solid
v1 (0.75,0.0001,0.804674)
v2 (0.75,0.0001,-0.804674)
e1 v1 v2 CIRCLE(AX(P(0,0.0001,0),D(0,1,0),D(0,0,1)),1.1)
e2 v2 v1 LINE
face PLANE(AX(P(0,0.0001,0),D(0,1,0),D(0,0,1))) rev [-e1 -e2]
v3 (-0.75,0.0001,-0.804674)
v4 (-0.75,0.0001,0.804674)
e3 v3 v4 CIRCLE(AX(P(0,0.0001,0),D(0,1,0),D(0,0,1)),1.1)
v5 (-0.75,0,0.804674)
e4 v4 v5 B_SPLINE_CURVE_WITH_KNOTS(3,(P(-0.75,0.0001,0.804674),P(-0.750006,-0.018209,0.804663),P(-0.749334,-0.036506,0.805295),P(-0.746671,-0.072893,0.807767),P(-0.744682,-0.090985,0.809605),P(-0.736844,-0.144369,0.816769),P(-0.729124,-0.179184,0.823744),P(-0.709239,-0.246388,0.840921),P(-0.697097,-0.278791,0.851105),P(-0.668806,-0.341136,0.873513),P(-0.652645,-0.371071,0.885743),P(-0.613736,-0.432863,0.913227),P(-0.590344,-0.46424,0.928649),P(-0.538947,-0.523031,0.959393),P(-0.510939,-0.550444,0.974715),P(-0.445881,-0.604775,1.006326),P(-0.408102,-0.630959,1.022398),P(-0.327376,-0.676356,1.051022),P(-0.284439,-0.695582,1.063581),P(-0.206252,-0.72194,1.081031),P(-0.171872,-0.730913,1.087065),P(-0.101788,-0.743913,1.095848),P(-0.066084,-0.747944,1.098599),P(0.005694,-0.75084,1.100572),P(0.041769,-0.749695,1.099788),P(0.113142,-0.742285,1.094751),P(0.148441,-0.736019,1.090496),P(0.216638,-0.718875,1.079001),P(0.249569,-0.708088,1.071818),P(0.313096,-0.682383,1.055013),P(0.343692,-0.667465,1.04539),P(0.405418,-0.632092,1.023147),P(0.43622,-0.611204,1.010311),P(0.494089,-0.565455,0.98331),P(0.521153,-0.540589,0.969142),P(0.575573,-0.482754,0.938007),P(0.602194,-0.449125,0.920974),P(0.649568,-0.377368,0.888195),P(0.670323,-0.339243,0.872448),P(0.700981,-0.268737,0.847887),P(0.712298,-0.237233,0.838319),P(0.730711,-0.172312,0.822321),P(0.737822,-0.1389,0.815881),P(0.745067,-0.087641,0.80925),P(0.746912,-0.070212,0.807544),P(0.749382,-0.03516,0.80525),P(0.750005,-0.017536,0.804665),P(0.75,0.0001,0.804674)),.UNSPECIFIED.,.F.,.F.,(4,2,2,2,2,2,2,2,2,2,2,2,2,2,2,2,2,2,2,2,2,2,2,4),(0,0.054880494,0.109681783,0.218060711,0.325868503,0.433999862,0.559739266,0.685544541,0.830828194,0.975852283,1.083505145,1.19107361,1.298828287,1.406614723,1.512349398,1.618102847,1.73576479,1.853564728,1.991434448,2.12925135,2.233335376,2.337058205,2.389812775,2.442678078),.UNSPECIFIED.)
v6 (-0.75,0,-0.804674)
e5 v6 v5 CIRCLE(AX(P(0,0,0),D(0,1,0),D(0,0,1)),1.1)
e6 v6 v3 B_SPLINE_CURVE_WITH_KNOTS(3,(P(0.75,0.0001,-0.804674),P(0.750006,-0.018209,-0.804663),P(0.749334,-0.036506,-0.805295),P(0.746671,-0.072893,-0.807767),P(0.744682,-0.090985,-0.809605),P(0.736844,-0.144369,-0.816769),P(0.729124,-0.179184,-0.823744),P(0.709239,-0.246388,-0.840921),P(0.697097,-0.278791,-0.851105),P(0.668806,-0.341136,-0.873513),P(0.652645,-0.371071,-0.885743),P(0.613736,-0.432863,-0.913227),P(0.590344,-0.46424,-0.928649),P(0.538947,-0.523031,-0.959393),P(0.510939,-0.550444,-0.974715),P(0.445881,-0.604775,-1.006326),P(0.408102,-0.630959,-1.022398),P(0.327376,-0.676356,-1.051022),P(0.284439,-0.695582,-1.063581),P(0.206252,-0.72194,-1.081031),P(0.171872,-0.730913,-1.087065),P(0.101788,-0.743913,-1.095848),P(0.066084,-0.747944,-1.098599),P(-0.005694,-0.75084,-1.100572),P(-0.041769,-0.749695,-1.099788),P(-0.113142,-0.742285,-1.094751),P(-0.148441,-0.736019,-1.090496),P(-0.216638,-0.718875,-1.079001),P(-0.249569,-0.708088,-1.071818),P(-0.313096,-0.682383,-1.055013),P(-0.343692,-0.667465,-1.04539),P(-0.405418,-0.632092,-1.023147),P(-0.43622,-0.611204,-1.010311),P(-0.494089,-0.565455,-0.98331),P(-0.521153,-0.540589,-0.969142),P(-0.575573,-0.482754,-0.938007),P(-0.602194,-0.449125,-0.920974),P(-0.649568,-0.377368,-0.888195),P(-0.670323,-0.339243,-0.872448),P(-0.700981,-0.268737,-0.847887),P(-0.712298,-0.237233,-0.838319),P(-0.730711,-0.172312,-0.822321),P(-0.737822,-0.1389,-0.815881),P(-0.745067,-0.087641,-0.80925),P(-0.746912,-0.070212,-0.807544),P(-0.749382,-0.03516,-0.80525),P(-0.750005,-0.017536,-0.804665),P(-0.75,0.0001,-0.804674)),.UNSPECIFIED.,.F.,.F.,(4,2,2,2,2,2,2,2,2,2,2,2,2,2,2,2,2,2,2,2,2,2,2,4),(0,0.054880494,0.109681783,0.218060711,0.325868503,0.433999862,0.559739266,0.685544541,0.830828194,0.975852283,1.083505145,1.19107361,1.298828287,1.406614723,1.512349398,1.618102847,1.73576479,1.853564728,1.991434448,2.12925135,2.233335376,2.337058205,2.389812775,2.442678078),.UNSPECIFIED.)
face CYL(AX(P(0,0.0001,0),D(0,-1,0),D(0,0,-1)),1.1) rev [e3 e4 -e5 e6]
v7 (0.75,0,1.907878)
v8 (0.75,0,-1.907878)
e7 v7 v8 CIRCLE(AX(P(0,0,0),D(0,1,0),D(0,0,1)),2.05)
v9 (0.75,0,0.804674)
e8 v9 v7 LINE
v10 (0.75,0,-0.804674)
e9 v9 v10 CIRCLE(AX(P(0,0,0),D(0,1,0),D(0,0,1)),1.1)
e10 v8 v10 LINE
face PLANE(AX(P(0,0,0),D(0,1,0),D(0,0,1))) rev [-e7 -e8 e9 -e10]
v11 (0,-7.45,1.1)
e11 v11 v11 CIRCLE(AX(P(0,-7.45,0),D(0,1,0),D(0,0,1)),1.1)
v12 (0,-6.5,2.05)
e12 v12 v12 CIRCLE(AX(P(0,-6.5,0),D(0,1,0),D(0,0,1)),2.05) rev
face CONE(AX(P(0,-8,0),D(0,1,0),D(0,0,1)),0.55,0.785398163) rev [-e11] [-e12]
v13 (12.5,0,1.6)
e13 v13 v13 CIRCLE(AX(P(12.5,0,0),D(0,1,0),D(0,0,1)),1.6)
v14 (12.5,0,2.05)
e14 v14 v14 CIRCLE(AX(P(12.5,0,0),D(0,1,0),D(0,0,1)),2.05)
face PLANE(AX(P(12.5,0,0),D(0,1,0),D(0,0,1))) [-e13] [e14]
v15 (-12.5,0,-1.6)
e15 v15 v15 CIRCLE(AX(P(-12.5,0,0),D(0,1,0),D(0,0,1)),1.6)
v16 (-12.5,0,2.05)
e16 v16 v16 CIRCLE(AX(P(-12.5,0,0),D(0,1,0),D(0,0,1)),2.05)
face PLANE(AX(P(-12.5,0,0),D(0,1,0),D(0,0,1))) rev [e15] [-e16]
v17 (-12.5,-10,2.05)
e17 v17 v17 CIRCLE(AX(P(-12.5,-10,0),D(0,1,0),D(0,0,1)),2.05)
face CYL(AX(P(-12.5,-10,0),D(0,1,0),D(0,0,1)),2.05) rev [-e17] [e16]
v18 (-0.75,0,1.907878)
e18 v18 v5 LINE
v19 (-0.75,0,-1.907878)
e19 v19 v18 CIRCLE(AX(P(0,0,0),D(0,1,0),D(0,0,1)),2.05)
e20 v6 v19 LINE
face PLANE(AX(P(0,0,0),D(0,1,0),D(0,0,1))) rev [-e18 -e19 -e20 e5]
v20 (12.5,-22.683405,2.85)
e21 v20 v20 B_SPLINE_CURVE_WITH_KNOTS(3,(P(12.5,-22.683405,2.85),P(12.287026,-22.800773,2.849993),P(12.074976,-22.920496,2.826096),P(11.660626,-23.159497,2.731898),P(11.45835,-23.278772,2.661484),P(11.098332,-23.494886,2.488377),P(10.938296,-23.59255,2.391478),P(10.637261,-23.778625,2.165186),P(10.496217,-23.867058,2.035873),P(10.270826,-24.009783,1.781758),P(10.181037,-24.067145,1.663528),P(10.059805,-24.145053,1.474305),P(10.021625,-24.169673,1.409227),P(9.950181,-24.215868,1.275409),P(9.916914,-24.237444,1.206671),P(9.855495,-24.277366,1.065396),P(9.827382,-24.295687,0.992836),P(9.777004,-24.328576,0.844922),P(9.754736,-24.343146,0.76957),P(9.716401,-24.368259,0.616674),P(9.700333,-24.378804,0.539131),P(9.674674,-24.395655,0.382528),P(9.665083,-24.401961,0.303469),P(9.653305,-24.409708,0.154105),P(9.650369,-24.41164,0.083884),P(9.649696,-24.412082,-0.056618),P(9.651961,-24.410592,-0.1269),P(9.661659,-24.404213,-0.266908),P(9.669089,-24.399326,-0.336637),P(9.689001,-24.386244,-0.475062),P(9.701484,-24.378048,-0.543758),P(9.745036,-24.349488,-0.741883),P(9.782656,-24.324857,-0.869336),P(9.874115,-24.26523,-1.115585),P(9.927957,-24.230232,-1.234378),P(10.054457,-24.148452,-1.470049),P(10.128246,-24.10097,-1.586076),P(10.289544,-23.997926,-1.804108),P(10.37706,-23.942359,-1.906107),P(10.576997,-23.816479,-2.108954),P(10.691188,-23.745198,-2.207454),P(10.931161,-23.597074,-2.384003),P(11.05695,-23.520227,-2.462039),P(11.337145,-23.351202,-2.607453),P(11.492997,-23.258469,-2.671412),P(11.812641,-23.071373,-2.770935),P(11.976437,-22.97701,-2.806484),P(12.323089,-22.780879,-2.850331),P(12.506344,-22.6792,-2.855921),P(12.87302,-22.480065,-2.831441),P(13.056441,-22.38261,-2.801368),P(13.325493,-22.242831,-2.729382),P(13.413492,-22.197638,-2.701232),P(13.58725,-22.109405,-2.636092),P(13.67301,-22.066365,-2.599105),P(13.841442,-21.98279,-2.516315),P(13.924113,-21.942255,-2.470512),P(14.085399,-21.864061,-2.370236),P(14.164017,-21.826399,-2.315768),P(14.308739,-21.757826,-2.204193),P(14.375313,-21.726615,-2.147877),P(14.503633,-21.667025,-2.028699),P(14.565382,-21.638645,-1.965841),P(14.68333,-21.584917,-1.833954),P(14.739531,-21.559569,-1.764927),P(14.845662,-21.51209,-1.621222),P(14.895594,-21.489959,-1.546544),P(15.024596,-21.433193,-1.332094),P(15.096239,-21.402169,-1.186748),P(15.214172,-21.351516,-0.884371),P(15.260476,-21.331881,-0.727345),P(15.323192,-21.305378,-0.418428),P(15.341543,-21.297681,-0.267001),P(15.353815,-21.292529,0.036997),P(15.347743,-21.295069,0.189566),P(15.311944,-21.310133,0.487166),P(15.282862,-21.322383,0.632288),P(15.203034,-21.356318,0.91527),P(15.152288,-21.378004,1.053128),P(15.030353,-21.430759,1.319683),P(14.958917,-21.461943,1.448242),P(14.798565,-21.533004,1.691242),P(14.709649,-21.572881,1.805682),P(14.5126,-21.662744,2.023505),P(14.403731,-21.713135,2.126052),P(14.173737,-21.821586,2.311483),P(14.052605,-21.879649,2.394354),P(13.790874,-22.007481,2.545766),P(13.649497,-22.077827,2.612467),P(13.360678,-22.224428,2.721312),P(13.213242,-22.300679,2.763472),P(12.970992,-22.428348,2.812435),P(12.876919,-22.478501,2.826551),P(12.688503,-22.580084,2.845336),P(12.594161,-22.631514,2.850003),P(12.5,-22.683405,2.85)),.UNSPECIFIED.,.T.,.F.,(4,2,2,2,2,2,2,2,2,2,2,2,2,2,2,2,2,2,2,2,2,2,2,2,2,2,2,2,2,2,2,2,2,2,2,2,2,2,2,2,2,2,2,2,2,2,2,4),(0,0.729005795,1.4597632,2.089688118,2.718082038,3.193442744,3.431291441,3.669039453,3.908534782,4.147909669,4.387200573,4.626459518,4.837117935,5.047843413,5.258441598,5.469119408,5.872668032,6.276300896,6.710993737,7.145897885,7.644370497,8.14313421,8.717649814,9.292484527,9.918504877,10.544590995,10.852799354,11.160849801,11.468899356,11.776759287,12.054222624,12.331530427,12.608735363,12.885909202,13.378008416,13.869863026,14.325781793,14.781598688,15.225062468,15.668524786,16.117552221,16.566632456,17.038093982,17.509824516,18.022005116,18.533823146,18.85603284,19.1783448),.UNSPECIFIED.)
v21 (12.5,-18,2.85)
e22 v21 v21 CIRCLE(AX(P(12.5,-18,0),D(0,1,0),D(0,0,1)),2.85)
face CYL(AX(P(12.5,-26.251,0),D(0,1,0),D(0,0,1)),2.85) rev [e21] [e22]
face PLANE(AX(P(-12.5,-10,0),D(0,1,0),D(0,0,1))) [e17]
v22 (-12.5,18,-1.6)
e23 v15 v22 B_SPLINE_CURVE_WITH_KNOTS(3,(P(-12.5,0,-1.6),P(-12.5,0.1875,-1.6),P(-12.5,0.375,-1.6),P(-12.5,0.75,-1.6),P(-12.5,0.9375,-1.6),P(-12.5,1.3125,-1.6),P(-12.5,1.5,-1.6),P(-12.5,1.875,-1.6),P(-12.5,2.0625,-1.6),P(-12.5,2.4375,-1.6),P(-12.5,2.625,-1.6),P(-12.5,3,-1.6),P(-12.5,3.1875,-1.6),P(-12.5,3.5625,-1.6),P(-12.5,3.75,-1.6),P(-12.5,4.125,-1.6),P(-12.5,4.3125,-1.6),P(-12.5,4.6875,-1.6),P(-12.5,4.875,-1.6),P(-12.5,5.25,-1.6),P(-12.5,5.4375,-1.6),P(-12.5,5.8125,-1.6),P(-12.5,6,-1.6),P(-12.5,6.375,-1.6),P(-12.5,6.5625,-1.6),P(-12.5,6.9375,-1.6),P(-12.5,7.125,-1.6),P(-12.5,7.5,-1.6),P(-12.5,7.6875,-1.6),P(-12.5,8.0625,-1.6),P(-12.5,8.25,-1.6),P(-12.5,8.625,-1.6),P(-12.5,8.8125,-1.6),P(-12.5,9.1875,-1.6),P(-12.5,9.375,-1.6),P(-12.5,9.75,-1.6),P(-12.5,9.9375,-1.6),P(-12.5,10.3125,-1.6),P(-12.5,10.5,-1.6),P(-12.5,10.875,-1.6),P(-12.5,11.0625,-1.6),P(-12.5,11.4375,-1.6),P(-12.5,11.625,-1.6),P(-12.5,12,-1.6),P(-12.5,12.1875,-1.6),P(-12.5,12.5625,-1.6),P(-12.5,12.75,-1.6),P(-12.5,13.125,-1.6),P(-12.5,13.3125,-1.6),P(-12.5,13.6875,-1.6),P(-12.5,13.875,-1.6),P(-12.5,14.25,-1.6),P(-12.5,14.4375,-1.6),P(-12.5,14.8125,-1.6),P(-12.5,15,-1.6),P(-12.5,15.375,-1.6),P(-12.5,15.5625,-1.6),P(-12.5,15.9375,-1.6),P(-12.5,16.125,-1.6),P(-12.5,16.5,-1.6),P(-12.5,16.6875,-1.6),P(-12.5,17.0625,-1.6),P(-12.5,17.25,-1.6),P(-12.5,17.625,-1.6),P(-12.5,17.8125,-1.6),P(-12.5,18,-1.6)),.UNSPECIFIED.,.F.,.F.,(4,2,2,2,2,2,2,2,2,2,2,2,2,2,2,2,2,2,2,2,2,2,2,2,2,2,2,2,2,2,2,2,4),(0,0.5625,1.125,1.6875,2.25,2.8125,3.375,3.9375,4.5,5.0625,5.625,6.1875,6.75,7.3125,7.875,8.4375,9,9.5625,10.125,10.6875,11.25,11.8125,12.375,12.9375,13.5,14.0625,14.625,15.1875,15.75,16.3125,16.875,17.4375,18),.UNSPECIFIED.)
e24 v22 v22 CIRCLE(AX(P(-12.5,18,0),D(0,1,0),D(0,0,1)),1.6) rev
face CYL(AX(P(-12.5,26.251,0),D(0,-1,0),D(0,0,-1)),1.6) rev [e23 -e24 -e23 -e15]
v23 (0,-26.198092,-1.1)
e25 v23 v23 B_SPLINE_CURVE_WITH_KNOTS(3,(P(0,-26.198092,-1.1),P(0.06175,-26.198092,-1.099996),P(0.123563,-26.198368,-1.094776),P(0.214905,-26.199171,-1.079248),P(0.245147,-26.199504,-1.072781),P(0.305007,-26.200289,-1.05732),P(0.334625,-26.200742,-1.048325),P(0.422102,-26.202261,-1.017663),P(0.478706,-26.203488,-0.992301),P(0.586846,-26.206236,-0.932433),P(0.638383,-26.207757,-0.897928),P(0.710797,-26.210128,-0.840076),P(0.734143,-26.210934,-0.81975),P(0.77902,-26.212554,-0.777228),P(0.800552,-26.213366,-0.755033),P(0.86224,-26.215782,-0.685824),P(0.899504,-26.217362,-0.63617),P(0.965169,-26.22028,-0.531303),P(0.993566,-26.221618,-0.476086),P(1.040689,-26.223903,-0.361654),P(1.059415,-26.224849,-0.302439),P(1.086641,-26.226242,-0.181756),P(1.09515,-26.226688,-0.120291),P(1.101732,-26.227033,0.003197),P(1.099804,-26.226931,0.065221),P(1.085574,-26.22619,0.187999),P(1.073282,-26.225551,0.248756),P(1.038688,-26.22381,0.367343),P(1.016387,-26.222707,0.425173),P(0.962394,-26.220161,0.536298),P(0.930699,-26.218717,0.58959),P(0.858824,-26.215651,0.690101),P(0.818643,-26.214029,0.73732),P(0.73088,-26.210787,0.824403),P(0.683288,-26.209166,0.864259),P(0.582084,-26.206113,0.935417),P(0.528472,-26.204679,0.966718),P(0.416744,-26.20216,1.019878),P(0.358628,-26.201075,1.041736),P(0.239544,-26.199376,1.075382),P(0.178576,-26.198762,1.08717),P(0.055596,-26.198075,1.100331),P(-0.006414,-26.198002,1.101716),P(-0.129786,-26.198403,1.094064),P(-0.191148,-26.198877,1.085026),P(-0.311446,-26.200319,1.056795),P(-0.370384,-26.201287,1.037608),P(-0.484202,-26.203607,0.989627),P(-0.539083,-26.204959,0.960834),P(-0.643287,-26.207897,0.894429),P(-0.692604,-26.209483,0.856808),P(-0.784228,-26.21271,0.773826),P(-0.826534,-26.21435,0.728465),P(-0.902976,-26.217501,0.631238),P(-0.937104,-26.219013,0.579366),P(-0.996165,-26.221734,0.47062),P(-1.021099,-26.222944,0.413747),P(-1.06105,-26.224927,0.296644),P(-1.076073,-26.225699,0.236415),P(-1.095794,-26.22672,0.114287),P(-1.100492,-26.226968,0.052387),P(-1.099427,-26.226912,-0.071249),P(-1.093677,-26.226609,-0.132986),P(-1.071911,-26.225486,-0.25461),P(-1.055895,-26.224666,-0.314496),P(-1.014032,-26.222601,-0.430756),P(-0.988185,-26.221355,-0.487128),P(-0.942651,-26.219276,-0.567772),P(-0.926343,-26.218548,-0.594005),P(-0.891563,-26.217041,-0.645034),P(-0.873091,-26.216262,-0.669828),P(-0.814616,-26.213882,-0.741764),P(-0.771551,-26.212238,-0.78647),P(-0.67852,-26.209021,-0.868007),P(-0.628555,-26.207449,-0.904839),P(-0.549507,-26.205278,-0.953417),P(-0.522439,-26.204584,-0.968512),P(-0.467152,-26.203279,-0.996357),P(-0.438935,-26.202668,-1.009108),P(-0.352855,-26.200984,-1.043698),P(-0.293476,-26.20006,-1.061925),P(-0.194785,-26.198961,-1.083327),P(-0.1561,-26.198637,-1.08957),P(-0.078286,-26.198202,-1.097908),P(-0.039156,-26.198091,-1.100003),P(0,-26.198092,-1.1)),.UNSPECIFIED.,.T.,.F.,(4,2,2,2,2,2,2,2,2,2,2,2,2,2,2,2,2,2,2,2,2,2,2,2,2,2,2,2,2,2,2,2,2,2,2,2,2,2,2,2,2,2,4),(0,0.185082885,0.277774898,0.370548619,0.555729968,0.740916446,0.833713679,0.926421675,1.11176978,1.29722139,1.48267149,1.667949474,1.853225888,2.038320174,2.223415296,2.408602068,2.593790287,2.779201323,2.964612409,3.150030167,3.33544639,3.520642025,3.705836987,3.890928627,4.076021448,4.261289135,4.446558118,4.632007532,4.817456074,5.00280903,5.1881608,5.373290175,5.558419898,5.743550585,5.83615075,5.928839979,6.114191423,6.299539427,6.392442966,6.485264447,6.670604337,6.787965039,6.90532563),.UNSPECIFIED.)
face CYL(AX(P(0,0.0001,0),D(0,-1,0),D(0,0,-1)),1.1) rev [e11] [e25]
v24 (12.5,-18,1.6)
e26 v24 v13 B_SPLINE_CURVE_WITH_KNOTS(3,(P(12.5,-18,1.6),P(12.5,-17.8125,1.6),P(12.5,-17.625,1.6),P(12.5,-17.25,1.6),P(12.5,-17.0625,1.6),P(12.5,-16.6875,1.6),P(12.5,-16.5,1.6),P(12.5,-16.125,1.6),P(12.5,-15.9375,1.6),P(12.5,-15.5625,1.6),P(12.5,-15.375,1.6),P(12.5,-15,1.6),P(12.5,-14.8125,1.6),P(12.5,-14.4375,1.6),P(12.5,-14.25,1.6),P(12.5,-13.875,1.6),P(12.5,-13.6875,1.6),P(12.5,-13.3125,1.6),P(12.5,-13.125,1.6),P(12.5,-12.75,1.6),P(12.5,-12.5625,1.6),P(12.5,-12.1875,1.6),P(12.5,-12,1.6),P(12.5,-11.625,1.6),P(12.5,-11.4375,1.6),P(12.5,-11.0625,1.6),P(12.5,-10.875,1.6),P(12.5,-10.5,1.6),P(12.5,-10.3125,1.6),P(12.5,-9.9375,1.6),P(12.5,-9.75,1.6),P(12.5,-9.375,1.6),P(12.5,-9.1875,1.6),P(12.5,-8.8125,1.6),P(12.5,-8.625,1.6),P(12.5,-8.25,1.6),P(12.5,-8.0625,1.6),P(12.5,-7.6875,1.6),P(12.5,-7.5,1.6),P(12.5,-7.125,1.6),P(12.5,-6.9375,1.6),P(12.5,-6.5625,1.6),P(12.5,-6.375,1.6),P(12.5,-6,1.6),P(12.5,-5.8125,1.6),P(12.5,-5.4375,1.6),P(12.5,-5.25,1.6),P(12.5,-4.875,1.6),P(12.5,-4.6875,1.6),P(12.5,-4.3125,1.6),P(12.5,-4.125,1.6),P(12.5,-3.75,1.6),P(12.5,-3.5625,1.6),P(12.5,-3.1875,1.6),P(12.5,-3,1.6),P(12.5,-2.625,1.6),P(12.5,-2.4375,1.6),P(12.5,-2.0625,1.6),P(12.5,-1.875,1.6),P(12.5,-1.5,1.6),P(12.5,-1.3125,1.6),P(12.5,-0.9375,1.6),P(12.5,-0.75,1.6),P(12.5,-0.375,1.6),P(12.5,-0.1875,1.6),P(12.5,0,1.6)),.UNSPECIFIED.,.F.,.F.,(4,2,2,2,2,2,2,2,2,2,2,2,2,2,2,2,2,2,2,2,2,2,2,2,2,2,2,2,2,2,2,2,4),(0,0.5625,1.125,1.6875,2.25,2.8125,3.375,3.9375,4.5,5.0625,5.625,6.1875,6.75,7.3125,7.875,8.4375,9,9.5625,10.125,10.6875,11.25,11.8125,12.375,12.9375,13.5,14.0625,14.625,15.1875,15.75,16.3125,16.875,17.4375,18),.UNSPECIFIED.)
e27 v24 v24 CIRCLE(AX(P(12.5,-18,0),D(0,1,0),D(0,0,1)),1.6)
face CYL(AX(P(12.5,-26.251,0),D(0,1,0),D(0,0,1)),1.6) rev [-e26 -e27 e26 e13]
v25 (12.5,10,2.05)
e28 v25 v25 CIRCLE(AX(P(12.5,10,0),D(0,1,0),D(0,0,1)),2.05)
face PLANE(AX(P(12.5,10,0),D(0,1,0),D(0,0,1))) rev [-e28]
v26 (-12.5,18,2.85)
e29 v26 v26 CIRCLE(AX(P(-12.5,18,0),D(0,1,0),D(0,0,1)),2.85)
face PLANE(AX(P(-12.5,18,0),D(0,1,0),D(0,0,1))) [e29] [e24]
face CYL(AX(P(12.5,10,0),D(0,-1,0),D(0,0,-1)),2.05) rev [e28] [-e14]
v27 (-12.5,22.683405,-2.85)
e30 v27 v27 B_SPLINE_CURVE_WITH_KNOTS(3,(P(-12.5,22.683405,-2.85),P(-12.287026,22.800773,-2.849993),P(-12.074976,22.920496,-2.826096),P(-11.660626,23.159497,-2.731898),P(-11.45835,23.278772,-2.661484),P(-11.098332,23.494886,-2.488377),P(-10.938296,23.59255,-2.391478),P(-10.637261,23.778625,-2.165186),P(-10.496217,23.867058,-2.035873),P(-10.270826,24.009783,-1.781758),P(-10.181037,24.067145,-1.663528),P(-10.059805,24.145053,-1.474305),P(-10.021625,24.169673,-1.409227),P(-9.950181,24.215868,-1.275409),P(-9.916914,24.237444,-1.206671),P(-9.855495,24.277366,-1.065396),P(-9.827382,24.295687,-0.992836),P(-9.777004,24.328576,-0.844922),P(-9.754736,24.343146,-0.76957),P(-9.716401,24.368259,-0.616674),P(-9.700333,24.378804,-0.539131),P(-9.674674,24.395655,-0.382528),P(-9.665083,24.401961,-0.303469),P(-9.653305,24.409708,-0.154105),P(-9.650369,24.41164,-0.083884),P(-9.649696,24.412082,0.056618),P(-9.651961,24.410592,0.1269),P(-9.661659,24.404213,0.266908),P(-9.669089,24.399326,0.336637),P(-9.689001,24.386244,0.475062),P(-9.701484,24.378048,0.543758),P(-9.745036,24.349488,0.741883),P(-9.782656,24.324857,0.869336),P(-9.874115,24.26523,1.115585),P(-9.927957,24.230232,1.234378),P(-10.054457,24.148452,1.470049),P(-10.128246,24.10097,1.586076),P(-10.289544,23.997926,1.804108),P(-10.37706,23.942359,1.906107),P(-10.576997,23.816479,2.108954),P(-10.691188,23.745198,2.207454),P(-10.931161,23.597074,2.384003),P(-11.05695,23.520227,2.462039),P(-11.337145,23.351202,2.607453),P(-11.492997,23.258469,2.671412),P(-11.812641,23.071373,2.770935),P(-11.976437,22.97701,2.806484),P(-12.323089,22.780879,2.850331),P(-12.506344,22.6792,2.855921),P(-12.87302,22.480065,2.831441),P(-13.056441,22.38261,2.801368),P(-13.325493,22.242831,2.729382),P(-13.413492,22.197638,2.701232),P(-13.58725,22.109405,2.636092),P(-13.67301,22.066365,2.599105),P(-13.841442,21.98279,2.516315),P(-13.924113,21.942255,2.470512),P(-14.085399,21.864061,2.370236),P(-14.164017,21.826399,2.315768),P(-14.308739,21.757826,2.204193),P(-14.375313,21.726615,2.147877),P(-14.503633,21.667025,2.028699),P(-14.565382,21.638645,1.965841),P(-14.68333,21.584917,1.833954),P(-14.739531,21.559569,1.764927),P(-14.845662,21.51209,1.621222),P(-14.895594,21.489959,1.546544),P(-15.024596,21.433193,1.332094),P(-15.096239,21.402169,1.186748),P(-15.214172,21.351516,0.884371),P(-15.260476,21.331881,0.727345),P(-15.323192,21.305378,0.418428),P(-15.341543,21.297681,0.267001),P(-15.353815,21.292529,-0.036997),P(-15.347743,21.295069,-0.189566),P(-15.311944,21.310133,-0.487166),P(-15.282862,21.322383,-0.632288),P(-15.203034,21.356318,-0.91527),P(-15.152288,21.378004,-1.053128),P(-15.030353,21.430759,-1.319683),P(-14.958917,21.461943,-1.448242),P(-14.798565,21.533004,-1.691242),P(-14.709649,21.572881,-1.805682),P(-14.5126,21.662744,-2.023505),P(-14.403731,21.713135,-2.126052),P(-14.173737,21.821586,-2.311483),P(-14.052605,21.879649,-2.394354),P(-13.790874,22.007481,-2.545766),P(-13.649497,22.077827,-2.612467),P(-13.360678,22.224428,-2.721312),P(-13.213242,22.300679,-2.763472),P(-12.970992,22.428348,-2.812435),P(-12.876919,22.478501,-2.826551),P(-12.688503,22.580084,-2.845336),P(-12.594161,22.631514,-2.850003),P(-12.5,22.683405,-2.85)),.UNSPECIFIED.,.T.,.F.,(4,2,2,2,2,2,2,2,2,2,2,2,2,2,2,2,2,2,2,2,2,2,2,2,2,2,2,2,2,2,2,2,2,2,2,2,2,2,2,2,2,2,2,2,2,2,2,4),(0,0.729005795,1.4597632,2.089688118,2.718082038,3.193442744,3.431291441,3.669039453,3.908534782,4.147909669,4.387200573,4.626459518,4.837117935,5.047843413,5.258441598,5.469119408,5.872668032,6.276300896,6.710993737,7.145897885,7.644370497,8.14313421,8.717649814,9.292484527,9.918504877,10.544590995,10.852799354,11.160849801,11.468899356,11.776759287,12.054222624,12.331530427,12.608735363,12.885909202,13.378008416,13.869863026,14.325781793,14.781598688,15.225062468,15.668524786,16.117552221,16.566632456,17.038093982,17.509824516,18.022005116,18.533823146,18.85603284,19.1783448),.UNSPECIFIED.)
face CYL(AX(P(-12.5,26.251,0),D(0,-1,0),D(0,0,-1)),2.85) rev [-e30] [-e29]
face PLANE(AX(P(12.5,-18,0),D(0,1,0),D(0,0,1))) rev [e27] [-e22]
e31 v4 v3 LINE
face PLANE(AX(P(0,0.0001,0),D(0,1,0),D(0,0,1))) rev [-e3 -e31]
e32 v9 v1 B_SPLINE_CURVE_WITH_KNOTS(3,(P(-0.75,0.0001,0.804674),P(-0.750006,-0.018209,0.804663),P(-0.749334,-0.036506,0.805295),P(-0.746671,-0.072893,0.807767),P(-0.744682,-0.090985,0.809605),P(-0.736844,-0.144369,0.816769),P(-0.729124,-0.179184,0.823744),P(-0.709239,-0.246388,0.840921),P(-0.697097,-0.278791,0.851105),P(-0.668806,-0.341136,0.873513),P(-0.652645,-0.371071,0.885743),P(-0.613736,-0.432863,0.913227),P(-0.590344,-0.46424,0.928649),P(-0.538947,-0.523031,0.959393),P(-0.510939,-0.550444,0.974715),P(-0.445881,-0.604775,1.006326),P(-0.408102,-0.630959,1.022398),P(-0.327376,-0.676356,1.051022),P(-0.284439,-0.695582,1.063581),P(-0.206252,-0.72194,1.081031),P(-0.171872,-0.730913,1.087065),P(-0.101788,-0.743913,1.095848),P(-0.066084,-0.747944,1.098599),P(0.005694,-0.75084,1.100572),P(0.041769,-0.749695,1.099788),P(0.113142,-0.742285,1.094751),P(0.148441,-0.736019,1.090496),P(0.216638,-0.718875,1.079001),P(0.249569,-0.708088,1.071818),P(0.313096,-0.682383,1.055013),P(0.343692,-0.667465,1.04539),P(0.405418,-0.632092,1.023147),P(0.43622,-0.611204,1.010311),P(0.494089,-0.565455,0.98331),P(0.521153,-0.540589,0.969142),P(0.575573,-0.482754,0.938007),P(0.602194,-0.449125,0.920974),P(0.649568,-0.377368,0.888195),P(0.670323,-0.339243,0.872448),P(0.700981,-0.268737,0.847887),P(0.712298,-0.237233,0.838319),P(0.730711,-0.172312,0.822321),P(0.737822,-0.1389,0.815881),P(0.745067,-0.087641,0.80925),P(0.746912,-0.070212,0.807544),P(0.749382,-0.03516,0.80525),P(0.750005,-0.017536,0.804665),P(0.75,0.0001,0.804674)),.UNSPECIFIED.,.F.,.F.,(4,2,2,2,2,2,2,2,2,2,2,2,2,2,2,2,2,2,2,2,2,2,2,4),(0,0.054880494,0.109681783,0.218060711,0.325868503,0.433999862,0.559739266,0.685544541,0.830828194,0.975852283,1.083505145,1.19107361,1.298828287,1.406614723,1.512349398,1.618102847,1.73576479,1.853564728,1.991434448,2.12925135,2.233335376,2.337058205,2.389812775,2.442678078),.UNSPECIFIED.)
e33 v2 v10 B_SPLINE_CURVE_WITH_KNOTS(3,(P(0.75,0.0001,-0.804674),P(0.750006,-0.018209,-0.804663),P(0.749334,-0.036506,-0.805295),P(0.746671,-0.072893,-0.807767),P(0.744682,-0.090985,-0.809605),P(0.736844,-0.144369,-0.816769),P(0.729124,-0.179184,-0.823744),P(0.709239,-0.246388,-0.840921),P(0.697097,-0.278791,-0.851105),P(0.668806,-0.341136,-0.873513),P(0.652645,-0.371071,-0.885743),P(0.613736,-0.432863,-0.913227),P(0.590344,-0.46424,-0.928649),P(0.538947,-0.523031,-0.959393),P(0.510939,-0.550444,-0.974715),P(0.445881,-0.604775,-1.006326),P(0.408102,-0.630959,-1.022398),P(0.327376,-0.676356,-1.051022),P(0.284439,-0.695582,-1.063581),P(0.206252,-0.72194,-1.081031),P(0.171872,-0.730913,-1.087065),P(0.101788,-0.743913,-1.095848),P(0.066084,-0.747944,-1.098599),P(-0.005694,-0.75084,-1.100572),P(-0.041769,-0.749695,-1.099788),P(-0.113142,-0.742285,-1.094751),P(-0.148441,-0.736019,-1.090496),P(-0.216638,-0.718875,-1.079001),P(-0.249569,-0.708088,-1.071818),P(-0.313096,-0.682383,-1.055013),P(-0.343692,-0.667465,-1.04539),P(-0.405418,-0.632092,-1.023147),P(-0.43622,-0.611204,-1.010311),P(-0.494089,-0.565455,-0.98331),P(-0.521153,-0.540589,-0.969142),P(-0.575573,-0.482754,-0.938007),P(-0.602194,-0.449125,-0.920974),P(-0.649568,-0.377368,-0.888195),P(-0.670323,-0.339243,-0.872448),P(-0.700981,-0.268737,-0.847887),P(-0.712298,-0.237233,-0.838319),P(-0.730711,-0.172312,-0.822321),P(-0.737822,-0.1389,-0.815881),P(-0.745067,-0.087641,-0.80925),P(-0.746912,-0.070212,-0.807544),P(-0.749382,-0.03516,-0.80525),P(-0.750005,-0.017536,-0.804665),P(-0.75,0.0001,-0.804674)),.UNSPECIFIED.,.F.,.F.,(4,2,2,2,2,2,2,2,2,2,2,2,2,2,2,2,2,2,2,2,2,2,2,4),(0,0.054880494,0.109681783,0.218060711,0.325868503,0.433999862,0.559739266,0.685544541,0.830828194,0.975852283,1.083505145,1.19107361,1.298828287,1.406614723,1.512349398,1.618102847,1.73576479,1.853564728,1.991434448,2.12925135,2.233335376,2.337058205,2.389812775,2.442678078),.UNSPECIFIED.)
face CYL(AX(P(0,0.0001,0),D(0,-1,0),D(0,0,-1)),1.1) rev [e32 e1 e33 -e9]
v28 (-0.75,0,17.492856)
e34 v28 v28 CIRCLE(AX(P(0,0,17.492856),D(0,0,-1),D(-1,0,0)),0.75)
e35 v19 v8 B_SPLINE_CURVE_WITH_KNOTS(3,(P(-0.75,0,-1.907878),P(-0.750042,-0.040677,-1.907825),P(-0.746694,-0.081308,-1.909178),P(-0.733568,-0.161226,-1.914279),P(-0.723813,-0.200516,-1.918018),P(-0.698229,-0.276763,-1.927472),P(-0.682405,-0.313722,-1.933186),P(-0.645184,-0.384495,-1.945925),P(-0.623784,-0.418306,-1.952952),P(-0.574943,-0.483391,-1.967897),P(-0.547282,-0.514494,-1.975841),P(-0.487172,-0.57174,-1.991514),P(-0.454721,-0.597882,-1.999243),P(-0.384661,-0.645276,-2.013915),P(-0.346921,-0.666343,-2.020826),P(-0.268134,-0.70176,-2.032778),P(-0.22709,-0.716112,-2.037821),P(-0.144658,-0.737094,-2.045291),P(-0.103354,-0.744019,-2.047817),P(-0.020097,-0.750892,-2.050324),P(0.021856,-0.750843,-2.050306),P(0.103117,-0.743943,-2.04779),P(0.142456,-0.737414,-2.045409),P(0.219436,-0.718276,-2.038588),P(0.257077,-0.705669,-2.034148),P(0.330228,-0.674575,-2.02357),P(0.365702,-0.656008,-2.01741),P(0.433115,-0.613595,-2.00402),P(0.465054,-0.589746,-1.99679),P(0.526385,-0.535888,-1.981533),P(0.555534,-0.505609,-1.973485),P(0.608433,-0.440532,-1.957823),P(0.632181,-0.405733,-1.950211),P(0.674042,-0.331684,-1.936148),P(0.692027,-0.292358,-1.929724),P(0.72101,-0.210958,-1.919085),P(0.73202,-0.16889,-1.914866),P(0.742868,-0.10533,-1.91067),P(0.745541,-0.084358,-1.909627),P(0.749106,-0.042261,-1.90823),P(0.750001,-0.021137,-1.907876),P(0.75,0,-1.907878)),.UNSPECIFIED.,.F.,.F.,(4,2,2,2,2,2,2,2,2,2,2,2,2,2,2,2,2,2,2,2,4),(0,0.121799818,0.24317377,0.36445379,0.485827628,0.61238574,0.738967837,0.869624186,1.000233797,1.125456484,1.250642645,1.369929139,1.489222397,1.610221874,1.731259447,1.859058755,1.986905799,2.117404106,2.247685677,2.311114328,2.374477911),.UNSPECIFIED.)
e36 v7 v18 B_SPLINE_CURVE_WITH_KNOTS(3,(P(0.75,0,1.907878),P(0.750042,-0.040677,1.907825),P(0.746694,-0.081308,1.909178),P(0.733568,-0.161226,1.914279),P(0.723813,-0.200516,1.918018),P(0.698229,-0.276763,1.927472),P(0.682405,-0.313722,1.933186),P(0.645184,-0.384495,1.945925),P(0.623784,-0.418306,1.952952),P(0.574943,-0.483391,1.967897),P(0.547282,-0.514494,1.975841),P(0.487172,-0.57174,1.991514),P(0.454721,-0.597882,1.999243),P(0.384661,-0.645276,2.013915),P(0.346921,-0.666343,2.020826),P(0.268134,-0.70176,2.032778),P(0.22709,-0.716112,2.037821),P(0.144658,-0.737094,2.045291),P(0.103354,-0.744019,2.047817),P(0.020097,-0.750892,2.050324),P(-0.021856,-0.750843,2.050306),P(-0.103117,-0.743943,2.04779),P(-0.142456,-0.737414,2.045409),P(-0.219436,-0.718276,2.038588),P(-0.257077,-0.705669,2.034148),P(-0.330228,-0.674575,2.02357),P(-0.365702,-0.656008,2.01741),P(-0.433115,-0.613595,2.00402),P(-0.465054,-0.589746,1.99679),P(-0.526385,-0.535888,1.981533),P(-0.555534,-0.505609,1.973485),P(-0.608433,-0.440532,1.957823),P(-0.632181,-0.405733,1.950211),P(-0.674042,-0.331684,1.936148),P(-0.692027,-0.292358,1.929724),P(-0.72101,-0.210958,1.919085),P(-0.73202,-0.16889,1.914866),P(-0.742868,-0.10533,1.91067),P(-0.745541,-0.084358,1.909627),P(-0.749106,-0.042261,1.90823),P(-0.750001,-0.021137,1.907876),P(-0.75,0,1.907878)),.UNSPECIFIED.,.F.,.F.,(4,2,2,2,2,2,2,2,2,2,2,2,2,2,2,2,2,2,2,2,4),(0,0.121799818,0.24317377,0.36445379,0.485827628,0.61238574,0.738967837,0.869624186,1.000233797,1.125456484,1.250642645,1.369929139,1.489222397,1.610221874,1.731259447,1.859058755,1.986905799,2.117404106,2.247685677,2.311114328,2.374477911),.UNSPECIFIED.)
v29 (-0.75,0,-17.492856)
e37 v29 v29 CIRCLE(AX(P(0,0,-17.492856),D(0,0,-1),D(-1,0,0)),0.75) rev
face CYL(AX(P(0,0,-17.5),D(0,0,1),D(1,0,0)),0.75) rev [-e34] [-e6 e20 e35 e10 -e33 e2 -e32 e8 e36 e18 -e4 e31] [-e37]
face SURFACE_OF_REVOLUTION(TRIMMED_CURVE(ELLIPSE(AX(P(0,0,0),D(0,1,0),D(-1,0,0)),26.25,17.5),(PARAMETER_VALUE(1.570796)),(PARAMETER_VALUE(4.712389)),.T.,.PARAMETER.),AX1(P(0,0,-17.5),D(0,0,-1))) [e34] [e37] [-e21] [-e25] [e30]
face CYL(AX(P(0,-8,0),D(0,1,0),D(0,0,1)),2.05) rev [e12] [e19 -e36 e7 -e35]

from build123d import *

# Parameters (mm, degrees)
CUT_EXTRUDE2_DEPTH      = 42.041138069
CUT_EXTRUDE2_DEPTH_BACK = 42.041138069
SKETCH4_R               = 0.75
CUT_EXTRUDE3_START      = -27
CUT_EXTRUDE3_OUTLINE_R  = 1.1
CUT_EXTRUDE3_DEPTH      = 27.0001
SKETCH6_R               = 2.05
CUT_EXTRUDE4_DEPTH      = 10
SKETCH6_5_R             = 2.05
CUT_EXTRUDE10_DEPTH     = 10
CUT_EXTRUDE8_REACH      = 43.038
SKETCH6_4_R             = 1.6
CUT_EXTRUDE11_REACH     = 43.038
SKETCH6_6_R             = 1.6
CUT_EXTRUDE9_REACH      = 61.038
CUT_EXTRUDE9_START      = -18
SKETCH11_R              = 2.85
CUT_EXTRUDE12_REACH     = 61.038
CUT_EXTRUDE12_START     = 18
SKETCH11_3_R            = 2.85
SKETCH12_R              = 2.05
CUT_EXTRUDE13_DEPTH     = 8
CHAMFER1_SIZE           = 1.5


with BuildPart() as part:
    # Sketch1 → Revolve4 (revolve)
    with BuildSketch(Plane(origin=(0, 0, 0), x_dir=(1, 0, 0), z_dir=(0, 1, 0))):
        with BuildLine():
            Line((0, 17.5), (0, -17.5))
            add(Edge.make_bspline(
                [(0, -17.5), (26.25, -17.5), (26.25, 0), (26.25, 17.5), (0, 17.5)],
                knots=[1.570796327, 1.570796327, 1.570796327, 3.141592654, 3.141592654, 4.71238898, 4.71238898, 4.71238898], degree=2, weights=[1, 0.707106781, 1, 0.707106781, 1]))
        make_face()
    revolve(axis=Axis((0, 0, -17.5), (0, 0, 1)))

    # Sketch4 → Cut-Extrude2 (cut, two sides: drawn at the far end of the back side and taken through both)
    with BuildSketch(Plane.XY.offset(-CUT_EXTRUDE2_DEPTH_BACK)):
        with Locations(Location((0, 0, 0), (0, 0, 180))):
            Circle(SKETCH4_R)
    extrude(amount=CUT_EXTRUDE2_DEPTH + CUT_EXTRUDE2_DEPTH_BACK, mode=Mode.SUBTRACT)

    # Cut-Extrude3: read off the stored shape, not the designer's step
    # Cut-Extrude3 outline → Cut-Extrude3 (cut)
    with BuildSketch(Plane(origin=(0, 0, 0), x_dir=(1, 0, 0), z_dir=(0, 1, 0)).offset(CUT_EXTRUDE3_START)):
        Circle(CUT_EXTRUDE3_OUTLINE_R)
    extrude(amount=CUT_EXTRUDE3_DEPTH, mode=Mode.SUBTRACT)

    # Sketch6 → Cut-Extrude4 (cut)
    with BuildSketch(Plane(origin=(0, 0, 0), x_dir=(1, 0, 0), z_dir=(0, 1, 0))):
        with Locations(Location((-12.5, 0, 0), (0, 0, 270))):
            Circle(SKETCH6_R)
    extrude(amount=-CUT_EXTRUDE4_DEPTH, mode=Mode.SUBTRACT)

    # Sketch6<5> → Cut-Extrude10 (cut)
    with BuildSketch(Plane(origin=(0, 0, 0), x_dir=(1, 0, 0), z_dir=(0, 1, 0))):
        with Locations(Location((12.5, 0, 0), (0, 0, 270))):
            Circle(SKETCH6_5_R)
    extrude(amount=CUT_EXTRUDE10_DEPTH, mode=Mode.SUBTRACT)

    # Sketch6<4> → Cut-Extrude8 (cut, up to next)
    with BuildSketch(Plane(origin=(0, 0, 0), x_dir=(1, 0, 0), z_dir=(0, 1, 0)), mode=Mode.PRIVATE) as cut_extrude8_sk1:
        with Locations(Location((12.5, 0, 0), (0, 0, 270))):
            Circle(SKETCH6_4_R)
    cut_extrude8_tool1 = extrude(cut_extrude8_sk1.sketch, amount=-CUT_EXTRUDE8_REACH, mode=Mode.PRIVATE) & part.part
    add(cut_extrude8_tool1.solids().sort_by_distance((12.5, 0, 0))[0], mode=Mode.SUBTRACT)

    # Sketch6<6> → Cut-Extrude11 (cut, up to next)
    with BuildSketch(Plane(origin=(0, 0, 0), x_dir=(1, 0, 0), z_dir=(0, 1, 0)), mode=Mode.PRIVATE) as cut_extrude11_sk1:
        with Locations(Location((-12.5, 0, 0), (0, 0, 90))):
            Circle(SKETCH6_6_R)
    cut_extrude11_tool1 = extrude(cut_extrude11_sk1.sketch, amount=CUT_EXTRUDE11_REACH, mode=Mode.PRIVATE) & part.part
    add(cut_extrude11_tool1.solids().sort_by_distance((-12.5, 0, 0))[0], mode=Mode.SUBTRACT)

    # Sketch11 → Cut-Extrude9 (cut, up to next)
    with BuildSketch(Plane(origin=(0, 0, 0), x_dir=(1, 0, 0), z_dir=(0, 1, 0)).offset(CUT_EXTRUDE9_START), mode=Mode.PRIVATE) as cut_extrude9_sk1:
        with Locations(Location((12.5, 0, 0), (0, 0, 270))):
            Circle(SKETCH11_R)
    cut_extrude9_tool1 = extrude(cut_extrude9_sk1.sketch, amount=-CUT_EXTRUDE9_REACH, mode=Mode.PRIVATE) & part.part
    add(cut_extrude9_tool1.solids().sort_by_distance((12.5, -18, 0))[0], mode=Mode.SUBTRACT)

    # Sketch11<3> → Cut-Extrude12 (cut, up to next)
    with BuildSketch(Plane(origin=(0, 0, 0), x_dir=(1, 0, 0), z_dir=(0, 1, 0)).offset(CUT_EXTRUDE12_START), mode=Mode.PRIVATE) as cut_extrude12_sk1:
        with Locations(Location((-12.5, 0, 0), (0, 0, 90))):
            Circle(SKETCH11_3_R)
    cut_extrude12_tool1 = extrude(cut_extrude12_sk1.sketch, amount=CUT_EXTRUDE12_REACH, mode=Mode.PRIVATE) & part.part
    add(cut_extrude12_tool1.solids().sort_by_distance((-12.5, 18, 0))[0], mode=Mode.SUBTRACT)

    # Sketch12 → Cut-Extrude13 (cut)
    with BuildSketch(Plane(origin=(0, 0, 0), x_dir=(1, 0, 0), z_dir=(0, 1, 0))):
        with Locations(Location((0, 0, 0), (0, 0, 270))):
            Circle(SKETCH12_R)
    extrude(amount=-CUT_EXTRUDE13_DEPTH, mode=Mode.SUBTRACT)

    # Chamfer1
    # the kernel refuses this chamfer: 1.5 mm, written as the material it adds along each edge
    with BuildSketch(Plane(origin=(0, -8, 0), x_dir=(0, 0, 1), z_dir=(-1, 0, 0))) as chamfer1_piece_1_section:
        Polygon((2.05 - CHAMFER1_SIZE, 0), (2.05, CHAMFER1_SIZE), (2.05, 0), align=None)
    chamfer1_piece_1 = revolve(axis=Axis((0, -8, 0), (0, 1, 0)), mode=Mode.PRIVATE)
    chamfer1_piece_1 = chamfer1_piece_1 - Plane(origin=(0, -8, 0), x_dir=(1, 0, 0), z_dir=(0, -1, 0)) * Cylinder(1.1, 9, mode=Mode.PRIVATE)
    add(chamfer1_piece_1)


solid = part.part
